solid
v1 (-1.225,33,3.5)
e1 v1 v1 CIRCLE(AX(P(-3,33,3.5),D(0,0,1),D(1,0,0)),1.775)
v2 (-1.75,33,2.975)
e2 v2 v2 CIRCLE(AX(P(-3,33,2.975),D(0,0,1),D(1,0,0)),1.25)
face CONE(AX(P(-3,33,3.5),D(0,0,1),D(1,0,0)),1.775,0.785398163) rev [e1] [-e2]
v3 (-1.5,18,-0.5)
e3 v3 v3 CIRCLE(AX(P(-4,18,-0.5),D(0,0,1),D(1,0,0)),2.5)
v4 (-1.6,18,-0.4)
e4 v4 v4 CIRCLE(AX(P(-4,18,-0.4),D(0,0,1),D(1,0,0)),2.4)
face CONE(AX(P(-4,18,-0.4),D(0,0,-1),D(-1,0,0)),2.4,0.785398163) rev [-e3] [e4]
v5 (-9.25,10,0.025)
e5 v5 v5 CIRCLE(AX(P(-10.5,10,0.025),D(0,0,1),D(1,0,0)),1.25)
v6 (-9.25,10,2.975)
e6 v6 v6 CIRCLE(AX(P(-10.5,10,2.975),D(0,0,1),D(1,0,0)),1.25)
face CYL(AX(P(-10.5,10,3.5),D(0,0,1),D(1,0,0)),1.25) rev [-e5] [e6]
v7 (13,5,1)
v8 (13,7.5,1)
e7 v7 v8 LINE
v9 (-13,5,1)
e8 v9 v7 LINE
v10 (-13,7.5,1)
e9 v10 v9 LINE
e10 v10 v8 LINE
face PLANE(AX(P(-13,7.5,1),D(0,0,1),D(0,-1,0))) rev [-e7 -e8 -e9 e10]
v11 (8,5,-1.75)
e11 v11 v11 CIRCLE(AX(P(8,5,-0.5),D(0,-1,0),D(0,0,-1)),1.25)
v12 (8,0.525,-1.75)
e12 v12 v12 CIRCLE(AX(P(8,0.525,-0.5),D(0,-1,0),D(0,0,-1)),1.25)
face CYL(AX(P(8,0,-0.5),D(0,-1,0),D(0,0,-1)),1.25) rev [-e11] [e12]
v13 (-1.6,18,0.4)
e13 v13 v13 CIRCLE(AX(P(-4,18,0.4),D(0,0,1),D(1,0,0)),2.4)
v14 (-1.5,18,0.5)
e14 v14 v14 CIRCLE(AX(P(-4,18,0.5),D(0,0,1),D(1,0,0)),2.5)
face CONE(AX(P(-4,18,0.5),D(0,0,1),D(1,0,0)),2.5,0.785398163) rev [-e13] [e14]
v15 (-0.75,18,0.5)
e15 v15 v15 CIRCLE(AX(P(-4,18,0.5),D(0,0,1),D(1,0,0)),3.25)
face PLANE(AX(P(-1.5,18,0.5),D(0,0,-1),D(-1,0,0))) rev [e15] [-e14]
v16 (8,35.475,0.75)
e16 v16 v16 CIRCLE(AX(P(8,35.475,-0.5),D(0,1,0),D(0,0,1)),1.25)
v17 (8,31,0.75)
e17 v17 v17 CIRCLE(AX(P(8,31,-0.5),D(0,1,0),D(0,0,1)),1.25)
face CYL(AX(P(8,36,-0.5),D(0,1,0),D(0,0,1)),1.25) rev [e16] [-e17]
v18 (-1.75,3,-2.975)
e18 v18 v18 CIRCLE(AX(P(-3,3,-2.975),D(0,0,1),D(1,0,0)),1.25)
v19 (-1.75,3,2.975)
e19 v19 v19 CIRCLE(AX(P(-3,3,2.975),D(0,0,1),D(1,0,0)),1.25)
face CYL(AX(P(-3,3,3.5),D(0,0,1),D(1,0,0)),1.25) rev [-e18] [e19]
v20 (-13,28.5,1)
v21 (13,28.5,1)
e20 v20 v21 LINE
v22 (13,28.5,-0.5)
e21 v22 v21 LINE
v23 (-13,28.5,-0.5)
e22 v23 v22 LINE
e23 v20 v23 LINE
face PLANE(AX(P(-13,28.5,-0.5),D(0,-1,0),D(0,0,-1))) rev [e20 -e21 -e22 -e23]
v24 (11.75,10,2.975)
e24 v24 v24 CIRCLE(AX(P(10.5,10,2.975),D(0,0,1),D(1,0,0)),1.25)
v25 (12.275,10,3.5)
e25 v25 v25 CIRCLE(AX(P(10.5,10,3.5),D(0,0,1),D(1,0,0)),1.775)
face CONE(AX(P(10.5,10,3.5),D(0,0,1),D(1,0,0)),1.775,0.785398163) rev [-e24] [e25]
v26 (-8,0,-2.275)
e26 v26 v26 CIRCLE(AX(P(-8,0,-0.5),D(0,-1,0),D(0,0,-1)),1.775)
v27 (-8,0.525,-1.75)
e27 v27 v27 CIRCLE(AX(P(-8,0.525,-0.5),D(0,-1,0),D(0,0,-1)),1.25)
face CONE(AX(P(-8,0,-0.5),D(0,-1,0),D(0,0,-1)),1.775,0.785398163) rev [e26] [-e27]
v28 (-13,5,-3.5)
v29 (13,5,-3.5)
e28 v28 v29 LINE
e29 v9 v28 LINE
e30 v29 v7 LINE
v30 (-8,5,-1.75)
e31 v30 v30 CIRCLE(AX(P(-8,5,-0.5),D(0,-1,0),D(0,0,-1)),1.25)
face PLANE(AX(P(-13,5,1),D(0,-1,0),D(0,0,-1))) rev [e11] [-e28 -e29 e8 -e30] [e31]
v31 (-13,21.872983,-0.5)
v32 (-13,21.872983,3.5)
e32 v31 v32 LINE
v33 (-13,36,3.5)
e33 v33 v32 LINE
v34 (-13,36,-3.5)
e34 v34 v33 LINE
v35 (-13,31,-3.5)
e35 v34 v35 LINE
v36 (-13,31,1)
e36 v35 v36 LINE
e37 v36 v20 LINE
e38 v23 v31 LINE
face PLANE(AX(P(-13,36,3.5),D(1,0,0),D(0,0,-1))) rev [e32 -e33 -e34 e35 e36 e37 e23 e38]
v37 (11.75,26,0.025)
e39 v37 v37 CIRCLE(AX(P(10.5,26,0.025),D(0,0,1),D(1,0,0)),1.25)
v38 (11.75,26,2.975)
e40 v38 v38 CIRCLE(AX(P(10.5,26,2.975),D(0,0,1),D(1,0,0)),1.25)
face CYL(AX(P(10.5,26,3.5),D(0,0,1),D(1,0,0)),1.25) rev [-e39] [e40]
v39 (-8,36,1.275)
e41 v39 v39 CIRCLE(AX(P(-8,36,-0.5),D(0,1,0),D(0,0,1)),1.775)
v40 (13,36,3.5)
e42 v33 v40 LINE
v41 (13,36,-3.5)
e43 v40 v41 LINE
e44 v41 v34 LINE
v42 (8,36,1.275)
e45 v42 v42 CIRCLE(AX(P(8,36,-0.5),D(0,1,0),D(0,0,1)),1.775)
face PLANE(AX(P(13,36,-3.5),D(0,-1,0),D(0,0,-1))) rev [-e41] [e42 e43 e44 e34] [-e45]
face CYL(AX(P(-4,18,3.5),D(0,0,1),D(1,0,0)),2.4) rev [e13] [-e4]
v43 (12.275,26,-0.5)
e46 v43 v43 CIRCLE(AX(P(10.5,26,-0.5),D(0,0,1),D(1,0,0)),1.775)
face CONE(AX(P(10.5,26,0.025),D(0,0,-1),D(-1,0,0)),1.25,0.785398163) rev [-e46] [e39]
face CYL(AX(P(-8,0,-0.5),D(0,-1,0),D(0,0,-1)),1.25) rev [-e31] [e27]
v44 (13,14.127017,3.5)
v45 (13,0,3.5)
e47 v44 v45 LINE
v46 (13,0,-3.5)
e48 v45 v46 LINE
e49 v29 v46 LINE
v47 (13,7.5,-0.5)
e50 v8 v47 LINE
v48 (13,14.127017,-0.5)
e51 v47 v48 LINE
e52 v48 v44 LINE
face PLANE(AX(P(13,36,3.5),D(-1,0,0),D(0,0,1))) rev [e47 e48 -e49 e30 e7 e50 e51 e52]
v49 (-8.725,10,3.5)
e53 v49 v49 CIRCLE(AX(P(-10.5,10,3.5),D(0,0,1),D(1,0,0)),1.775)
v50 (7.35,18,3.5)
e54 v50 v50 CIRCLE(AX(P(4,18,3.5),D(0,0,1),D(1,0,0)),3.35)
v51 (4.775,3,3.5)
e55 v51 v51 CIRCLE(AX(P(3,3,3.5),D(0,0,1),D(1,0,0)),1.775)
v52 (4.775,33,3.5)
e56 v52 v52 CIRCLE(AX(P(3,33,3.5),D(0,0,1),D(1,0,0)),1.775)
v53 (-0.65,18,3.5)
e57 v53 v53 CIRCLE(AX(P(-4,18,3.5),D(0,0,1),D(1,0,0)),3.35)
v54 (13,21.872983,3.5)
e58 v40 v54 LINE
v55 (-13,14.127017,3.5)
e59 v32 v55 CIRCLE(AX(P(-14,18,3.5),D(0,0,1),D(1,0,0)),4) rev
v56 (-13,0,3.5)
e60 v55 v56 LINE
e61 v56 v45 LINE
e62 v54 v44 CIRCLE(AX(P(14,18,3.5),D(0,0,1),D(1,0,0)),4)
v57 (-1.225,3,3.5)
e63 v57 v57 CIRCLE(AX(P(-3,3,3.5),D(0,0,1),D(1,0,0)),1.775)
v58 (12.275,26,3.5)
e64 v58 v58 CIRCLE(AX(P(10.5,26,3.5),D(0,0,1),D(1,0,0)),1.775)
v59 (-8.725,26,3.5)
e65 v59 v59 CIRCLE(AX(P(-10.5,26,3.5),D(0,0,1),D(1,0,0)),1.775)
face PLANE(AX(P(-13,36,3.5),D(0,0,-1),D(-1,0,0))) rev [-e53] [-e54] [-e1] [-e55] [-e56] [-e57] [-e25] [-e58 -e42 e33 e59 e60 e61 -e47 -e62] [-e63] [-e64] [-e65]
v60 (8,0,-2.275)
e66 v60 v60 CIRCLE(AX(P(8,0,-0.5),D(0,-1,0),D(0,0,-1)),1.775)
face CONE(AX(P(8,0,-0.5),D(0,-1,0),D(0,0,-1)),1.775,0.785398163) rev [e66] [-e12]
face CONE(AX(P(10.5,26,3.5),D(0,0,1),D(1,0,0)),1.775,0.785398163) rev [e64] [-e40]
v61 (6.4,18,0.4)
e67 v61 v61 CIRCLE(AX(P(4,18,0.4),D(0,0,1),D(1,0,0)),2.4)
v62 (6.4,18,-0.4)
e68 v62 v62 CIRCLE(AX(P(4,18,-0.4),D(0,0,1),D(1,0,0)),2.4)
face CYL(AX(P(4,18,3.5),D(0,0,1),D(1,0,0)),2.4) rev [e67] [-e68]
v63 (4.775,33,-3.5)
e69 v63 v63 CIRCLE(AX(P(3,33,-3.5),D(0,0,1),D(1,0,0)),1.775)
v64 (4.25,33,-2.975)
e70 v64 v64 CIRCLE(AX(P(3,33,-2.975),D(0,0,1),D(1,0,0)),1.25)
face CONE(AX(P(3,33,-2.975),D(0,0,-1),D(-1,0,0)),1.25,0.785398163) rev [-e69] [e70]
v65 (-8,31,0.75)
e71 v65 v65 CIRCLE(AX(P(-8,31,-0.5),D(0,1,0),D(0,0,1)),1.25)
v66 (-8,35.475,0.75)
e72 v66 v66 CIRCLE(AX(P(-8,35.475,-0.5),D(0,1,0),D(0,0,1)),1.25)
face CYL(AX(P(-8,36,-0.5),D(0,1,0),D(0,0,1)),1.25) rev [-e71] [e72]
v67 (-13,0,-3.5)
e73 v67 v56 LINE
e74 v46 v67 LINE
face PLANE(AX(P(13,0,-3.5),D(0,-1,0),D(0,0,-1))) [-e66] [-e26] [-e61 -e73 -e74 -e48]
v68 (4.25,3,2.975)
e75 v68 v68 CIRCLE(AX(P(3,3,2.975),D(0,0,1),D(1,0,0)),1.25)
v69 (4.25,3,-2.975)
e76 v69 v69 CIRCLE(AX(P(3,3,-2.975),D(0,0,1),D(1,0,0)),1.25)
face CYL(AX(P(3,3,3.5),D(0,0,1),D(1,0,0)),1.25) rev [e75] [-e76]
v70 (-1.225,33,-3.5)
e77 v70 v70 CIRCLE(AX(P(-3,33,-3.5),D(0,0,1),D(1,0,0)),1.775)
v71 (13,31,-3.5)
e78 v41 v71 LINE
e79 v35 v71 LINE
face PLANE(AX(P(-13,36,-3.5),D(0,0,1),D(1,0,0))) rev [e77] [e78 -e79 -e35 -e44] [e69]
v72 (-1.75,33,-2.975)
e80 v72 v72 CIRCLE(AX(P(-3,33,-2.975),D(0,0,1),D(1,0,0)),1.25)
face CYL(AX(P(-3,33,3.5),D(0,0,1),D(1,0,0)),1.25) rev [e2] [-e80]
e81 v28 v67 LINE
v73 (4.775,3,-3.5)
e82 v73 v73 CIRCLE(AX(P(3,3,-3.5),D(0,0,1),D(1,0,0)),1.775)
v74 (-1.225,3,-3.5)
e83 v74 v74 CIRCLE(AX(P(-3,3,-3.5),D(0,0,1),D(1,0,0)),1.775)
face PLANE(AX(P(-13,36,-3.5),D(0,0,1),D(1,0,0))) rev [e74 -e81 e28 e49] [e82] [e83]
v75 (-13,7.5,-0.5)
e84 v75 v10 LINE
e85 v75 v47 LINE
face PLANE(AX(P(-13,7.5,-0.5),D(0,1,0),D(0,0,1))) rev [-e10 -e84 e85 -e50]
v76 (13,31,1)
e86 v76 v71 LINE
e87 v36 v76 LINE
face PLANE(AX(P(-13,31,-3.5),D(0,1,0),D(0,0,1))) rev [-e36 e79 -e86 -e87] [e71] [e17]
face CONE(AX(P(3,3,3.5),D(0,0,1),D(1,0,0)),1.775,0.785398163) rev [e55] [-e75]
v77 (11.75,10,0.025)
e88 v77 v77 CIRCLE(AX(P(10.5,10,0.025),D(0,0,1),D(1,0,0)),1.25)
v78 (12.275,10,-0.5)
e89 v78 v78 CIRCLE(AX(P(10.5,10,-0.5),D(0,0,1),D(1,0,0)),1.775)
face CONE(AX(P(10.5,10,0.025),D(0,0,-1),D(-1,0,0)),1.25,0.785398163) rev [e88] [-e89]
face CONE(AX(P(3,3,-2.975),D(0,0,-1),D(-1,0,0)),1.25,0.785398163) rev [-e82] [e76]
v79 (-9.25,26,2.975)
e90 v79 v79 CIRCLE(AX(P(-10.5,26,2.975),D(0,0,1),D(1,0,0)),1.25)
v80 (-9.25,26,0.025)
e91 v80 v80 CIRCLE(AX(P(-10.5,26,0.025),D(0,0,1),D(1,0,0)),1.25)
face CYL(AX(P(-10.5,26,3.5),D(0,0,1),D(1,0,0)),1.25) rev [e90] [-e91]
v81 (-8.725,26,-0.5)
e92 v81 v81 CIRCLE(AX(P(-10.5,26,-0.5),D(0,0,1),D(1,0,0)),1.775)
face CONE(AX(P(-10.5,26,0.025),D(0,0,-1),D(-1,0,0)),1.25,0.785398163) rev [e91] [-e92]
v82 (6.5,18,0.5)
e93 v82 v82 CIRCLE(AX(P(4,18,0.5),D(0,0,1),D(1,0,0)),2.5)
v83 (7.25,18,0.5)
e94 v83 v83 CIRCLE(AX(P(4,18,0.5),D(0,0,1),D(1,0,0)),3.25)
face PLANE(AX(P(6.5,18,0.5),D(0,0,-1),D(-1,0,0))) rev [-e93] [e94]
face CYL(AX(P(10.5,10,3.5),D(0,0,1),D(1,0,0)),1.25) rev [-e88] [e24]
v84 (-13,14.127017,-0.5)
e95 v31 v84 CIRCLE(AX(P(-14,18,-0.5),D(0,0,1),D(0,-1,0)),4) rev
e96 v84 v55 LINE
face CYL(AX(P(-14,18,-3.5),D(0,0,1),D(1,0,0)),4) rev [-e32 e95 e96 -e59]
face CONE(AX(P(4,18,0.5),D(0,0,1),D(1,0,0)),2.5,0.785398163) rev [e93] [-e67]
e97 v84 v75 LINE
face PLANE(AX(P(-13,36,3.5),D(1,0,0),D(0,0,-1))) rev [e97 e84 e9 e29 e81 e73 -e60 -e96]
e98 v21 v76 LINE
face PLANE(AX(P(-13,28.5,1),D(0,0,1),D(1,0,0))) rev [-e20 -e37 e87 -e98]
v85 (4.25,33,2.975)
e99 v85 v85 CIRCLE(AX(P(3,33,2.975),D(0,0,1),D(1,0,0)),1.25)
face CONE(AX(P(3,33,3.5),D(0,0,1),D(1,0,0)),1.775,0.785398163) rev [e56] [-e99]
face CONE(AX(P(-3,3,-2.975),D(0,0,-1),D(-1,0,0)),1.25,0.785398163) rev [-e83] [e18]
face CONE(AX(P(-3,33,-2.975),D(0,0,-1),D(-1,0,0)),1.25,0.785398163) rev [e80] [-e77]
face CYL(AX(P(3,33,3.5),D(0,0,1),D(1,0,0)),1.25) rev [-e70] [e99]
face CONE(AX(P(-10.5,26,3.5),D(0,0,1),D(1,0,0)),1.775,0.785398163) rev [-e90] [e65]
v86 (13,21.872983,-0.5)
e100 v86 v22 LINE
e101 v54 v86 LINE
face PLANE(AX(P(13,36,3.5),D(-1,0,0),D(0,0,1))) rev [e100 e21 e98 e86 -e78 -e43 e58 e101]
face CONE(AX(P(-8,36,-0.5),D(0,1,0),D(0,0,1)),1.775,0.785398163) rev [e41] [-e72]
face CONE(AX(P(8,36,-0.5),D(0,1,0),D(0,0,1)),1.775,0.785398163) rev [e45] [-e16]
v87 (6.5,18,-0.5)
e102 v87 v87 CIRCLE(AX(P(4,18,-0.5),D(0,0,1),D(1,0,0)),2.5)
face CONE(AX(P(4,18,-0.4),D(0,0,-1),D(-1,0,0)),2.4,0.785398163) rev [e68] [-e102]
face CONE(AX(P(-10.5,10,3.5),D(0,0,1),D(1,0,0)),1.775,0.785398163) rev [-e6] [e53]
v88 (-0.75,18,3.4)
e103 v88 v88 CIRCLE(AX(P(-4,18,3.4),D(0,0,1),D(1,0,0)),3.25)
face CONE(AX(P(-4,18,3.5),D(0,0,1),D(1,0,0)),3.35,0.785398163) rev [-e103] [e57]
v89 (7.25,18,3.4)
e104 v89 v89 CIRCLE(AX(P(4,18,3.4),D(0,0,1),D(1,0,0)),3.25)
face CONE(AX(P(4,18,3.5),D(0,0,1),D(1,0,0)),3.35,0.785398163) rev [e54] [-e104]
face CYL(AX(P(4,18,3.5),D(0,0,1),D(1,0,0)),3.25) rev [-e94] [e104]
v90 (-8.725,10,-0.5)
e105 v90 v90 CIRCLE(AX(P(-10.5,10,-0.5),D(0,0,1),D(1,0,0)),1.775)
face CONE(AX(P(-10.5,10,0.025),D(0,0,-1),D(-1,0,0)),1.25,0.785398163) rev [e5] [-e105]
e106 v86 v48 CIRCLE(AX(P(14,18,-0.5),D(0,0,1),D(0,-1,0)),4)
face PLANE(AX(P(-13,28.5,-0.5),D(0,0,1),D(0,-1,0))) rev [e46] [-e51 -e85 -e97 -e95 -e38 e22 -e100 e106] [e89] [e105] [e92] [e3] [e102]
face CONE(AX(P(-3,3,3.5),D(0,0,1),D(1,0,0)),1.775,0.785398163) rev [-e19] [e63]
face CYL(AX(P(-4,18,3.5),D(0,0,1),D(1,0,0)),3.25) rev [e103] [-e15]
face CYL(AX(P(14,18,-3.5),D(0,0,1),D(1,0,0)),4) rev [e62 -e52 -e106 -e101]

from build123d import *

# Parameters (mm, degrees)
SKETCH_1_W                   = 26
SKETCH_1_H                   = 7
EXTRUDE_1_DEPTH              = 36
CUT_EXTRUDE_1_DEPTH          = 45.544921147
HOLE_WIZARD_M32_D            = 2.5
HOLE_WIZARD_M32_DEPTH        = 5
HOLE_WIZARD_M32_CSINK_D      = 3.55
HOLE_WIZARD_M32_CSINK_ANGLE  = 90
HOLE_WIZARD_M33_D            = 2.5
HOLE_WIZARD_M33_DEPTH        = 5
HOLE_WIZARD_M33_CSINK_D      = 3.55
HOLE_WIZARD_M33_CSINK_ANGLE  = 90
CUT_EXTRUDE_4_DEPTH          = 39.910152917
HOLE_WIZARD_M31_9_AT_2_COUNT = 2
HOLE_WIZARD_M31_9_AT_2_PITCH = 8


# Read off the part's stored shape, not the designer's step: Отверстие обработанное метчиком M31
with BuildPart() as part:
    # Эскиз1 → Бобышка-Вытянуть1 (new body)
    with BuildSketch(Plane(origin=(0, 0, 0), x_dir=(1, 0, 0), z_dir=(0, 1, 0))):
        Rectangle(SKETCH_1_W, SKETCH_1_H)
    extrude(amount=EXTRUDE_1_DEPTH)

    # Эскиз2 → Вырез-Вытянуть1 (cut, through all)
    with BuildSketch(Plane.ZY.offset(13)):
        Polygon((-77.060994328, 31), (-3.5, 31), (1, 31), (1, 28.5), (-0.5, 28.5), (-0.5, 7.5), (1, 7.5), (1, 5), (-3.5, 5), (-77.060994328, 5), (-224.182982985, 5), (-224.182982985, 31), align=None)
    extrude(amount=-CUT_EXTRUDE_1_DEPTH, mode=Mode.SUBTRACT)

    # Hole Wizard M31 outline → Hole Wizard M31 (revolve, cut)
    with BuildSketch(Plane(origin=(10.5, 26, 0), x_dir=(1, 0, 0), z_dir=(0, -1, 0))):
        Polygon((0, -0.5), (1.775, -0.5), (1.25, 0.025), (1.25, 2.975), (1.775, 3.5), (0, 3.5), align=None)
    revolve(axis=Axis((10.5, 26, 0), (0, 0, 1)), mode=Mode.SUBTRACT)

    # Hole Wizard M31 2 outline → Hole Wizard M31 2 (revolve, cut)
    with BuildSketch(Plane(origin=(-10.5, 10, 0), x_dir=(1, 0, 0), z_dir=(0, -1, 0))):
        Polygon((0, -0.5), (1.775, -0.5), (1.25, 0.025), (1.25, 2.975), (1.775, 3.5), (0, 3.5), align=None)
    revolve(axis=Axis((-10.5, 10, 0), (0, 0, 1)), mode=Mode.SUBTRACT)

    # Hole Wizard M31 3 outline → Hole Wizard M31 3 (revolve, cut)
    with BuildSketch(Plane(origin=(-10.5, 26, 0), x_dir=(1, 0, 0), z_dir=(0, -1, 0))):
        Polygon((0, -0.5), (1.775, -0.5), (1.25, 0.025), (1.25, 2.975), (1.775, 3.5), (0, 3.5), align=None)
    revolve(axis=Axis((-10.5, 26, 0), (0, 0, 1)), mode=Mode.SUBTRACT)

    # Hole Wizard M31 4 outline → Hole Wizard M31 4 (revolve, cut)
    with BuildSketch(Plane(origin=(10.5, 10, 0), x_dir=(1, 0, 0), z_dir=(0, -1, 0))):
        Polygon((0, -0.5), (1.775, -0.5), (1.25, 0.025), (1.25, 2.975), (1.775, 3.5), (0, 3.5), align=None)
    revolve(axis=Axis((10.5, 10, 0), (0, 0, 1)), mode=Mode.SUBTRACT)

    # Hole Wizard M31 5 outline → Hole Wizard M31 5 (revolve, cut)
    with BuildSketch(Plane(origin=(-3, 33, 0), x_dir=(1, 0, 0), z_dir=(0, -1, 0))):
        Polygon((0, -3.5), (1.775, -3.5), (1.25, -2.975), (1.25, 2.975), (1.775, 3.5), (0, 3.5), align=None)
    revolve(axis=Axis((-3, 33, 0), (0, 0, 1)), mode=Mode.SUBTRACT)

    # Hole Wizard M31 6 outline → Hole Wizard M31 6 (revolve, cut)
    with BuildSketch(Plane(origin=(3, 3, 0), x_dir=(1, 0, 0), z_dir=(0, -1, 0))):
        Polygon((0, -3.5), (1.775, -3.5), (1.25, -2.975), (1.25, 2.975), (1.775, 3.5), (0, 3.5), align=None)
    revolve(axis=Axis((3, 3, 0), (0, 0, 1)), mode=Mode.SUBTRACT)

    # Hole Wizard M31 7 outline → Hole Wizard M31 7 (revolve, cut)
    with BuildSketch(Plane(origin=(-3, 3, 0), x_dir=(1, 0, 0), z_dir=(0, -1, 0))):
        Polygon((0, -3.5), (1.775, -3.5), (1.25, -2.975), (1.25, 2.975), (1.775, 3.5), (0, 3.5), align=None)
    revolve(axis=Axis((-3, 3, 0), (0, 0, 1)), mode=Mode.SUBTRACT)

    # Hole Wizard M31 8 outline → Hole Wizard M31 8 (revolve, cut)
    with BuildSketch(Plane(origin=(3, 33, 0), x_dir=(1, 0, 0), z_dir=(0, -1, 0))):
        Polygon((0, -3.5), (1.775, -3.5), (1.25, -2.975), (1.25, 2.975), (1.775, 3.5), (0, 3.5), align=None)
    revolve(axis=Axis((3, 33, 0), (0, 0, 1)), mode=Mode.SUBTRACT)

    # Отверстие обработанное метчиком M32
    with Locations(Plane.XZ):
        with Locations((8, -0.5), (-8, -0.5)):
            CounterSinkHole(HOLE_WIZARD_M32_D / 2, HOLE_WIZARD_M32_CSINK_D / 2, depth=HOLE_WIZARD_M32_DEPTH, counter_sink_angle=HOLE_WIZARD_M32_CSINK_ANGLE)

    # Отверстие обработанное метчиком M33
    with Locations(Plane(origin=(0, 36, 0), x_dir=(-1, 0, 0), z_dir=(0, 1, 0))):
        with Locations((8, -0.5), (-8, -0.5)):
            CounterSinkHole(HOLE_WIZARD_M33_D / 2, HOLE_WIZARD_M33_CSINK_D / 2, depth=HOLE_WIZARD_M33_DEPTH, counter_sink_angle=HOLE_WIZARD_M33_CSINK_ANGLE)

    # Эскиз10 → Вырез-Вытянуть4 (cut, through all)
    with BuildSketch(Plane.XY.offset(3.5)):
        with BuildLine():
            ThreePointArc((-13, 14.127016654), (-10, 18), (-13, 21.872983346))
            Line((-13, 21.872983346), (-13, 14.127016654))
        make_face()
        with BuildLine():
            Line((13, 14.127016654), (13, 21.872983346))
            ThreePointArc((13, 21.872983346), (10, 18), (13, 14.127016654))
        make_face()
    extrude(amount=-CUT_EXTRUDE_4_DEPTH, mode=Mode.SUBTRACT)

    # Эскиз11 → Hole Wizard M31 9 (revolve, cut)
    with BuildSketch(Plane(origin=(-4, 18, 3.5), x_dir=(0, -1, 0), z_dir=(1, 0, 0))):
        Polygon((0, 0), (0, 4), (2.5, 4), (2.4, 3.9), (2.4, 3.1), (2.5, 3), (3.25, 3), (3.25, 0.1), (3.35, 0), align=None)
    hole_wizard_m31_9 = revolve(axis=Axis((-4, 18, 9.85), (0, 0, -1)), mode=Mode.SUBTRACT)

    # Hole Wizard M31 9 at 2: Hole Wizard M31 9 ×2
    with Locations(*[(i * HOLE_WIZARD_M31_9_AT_2_PITCH, 0, 0) for i in range(1, HOLE_WIZARD_M31_9_AT_2_COUNT)]):
        add(hole_wizard_m31_9, mode=Mode.SUBTRACT)


solid = part.part
